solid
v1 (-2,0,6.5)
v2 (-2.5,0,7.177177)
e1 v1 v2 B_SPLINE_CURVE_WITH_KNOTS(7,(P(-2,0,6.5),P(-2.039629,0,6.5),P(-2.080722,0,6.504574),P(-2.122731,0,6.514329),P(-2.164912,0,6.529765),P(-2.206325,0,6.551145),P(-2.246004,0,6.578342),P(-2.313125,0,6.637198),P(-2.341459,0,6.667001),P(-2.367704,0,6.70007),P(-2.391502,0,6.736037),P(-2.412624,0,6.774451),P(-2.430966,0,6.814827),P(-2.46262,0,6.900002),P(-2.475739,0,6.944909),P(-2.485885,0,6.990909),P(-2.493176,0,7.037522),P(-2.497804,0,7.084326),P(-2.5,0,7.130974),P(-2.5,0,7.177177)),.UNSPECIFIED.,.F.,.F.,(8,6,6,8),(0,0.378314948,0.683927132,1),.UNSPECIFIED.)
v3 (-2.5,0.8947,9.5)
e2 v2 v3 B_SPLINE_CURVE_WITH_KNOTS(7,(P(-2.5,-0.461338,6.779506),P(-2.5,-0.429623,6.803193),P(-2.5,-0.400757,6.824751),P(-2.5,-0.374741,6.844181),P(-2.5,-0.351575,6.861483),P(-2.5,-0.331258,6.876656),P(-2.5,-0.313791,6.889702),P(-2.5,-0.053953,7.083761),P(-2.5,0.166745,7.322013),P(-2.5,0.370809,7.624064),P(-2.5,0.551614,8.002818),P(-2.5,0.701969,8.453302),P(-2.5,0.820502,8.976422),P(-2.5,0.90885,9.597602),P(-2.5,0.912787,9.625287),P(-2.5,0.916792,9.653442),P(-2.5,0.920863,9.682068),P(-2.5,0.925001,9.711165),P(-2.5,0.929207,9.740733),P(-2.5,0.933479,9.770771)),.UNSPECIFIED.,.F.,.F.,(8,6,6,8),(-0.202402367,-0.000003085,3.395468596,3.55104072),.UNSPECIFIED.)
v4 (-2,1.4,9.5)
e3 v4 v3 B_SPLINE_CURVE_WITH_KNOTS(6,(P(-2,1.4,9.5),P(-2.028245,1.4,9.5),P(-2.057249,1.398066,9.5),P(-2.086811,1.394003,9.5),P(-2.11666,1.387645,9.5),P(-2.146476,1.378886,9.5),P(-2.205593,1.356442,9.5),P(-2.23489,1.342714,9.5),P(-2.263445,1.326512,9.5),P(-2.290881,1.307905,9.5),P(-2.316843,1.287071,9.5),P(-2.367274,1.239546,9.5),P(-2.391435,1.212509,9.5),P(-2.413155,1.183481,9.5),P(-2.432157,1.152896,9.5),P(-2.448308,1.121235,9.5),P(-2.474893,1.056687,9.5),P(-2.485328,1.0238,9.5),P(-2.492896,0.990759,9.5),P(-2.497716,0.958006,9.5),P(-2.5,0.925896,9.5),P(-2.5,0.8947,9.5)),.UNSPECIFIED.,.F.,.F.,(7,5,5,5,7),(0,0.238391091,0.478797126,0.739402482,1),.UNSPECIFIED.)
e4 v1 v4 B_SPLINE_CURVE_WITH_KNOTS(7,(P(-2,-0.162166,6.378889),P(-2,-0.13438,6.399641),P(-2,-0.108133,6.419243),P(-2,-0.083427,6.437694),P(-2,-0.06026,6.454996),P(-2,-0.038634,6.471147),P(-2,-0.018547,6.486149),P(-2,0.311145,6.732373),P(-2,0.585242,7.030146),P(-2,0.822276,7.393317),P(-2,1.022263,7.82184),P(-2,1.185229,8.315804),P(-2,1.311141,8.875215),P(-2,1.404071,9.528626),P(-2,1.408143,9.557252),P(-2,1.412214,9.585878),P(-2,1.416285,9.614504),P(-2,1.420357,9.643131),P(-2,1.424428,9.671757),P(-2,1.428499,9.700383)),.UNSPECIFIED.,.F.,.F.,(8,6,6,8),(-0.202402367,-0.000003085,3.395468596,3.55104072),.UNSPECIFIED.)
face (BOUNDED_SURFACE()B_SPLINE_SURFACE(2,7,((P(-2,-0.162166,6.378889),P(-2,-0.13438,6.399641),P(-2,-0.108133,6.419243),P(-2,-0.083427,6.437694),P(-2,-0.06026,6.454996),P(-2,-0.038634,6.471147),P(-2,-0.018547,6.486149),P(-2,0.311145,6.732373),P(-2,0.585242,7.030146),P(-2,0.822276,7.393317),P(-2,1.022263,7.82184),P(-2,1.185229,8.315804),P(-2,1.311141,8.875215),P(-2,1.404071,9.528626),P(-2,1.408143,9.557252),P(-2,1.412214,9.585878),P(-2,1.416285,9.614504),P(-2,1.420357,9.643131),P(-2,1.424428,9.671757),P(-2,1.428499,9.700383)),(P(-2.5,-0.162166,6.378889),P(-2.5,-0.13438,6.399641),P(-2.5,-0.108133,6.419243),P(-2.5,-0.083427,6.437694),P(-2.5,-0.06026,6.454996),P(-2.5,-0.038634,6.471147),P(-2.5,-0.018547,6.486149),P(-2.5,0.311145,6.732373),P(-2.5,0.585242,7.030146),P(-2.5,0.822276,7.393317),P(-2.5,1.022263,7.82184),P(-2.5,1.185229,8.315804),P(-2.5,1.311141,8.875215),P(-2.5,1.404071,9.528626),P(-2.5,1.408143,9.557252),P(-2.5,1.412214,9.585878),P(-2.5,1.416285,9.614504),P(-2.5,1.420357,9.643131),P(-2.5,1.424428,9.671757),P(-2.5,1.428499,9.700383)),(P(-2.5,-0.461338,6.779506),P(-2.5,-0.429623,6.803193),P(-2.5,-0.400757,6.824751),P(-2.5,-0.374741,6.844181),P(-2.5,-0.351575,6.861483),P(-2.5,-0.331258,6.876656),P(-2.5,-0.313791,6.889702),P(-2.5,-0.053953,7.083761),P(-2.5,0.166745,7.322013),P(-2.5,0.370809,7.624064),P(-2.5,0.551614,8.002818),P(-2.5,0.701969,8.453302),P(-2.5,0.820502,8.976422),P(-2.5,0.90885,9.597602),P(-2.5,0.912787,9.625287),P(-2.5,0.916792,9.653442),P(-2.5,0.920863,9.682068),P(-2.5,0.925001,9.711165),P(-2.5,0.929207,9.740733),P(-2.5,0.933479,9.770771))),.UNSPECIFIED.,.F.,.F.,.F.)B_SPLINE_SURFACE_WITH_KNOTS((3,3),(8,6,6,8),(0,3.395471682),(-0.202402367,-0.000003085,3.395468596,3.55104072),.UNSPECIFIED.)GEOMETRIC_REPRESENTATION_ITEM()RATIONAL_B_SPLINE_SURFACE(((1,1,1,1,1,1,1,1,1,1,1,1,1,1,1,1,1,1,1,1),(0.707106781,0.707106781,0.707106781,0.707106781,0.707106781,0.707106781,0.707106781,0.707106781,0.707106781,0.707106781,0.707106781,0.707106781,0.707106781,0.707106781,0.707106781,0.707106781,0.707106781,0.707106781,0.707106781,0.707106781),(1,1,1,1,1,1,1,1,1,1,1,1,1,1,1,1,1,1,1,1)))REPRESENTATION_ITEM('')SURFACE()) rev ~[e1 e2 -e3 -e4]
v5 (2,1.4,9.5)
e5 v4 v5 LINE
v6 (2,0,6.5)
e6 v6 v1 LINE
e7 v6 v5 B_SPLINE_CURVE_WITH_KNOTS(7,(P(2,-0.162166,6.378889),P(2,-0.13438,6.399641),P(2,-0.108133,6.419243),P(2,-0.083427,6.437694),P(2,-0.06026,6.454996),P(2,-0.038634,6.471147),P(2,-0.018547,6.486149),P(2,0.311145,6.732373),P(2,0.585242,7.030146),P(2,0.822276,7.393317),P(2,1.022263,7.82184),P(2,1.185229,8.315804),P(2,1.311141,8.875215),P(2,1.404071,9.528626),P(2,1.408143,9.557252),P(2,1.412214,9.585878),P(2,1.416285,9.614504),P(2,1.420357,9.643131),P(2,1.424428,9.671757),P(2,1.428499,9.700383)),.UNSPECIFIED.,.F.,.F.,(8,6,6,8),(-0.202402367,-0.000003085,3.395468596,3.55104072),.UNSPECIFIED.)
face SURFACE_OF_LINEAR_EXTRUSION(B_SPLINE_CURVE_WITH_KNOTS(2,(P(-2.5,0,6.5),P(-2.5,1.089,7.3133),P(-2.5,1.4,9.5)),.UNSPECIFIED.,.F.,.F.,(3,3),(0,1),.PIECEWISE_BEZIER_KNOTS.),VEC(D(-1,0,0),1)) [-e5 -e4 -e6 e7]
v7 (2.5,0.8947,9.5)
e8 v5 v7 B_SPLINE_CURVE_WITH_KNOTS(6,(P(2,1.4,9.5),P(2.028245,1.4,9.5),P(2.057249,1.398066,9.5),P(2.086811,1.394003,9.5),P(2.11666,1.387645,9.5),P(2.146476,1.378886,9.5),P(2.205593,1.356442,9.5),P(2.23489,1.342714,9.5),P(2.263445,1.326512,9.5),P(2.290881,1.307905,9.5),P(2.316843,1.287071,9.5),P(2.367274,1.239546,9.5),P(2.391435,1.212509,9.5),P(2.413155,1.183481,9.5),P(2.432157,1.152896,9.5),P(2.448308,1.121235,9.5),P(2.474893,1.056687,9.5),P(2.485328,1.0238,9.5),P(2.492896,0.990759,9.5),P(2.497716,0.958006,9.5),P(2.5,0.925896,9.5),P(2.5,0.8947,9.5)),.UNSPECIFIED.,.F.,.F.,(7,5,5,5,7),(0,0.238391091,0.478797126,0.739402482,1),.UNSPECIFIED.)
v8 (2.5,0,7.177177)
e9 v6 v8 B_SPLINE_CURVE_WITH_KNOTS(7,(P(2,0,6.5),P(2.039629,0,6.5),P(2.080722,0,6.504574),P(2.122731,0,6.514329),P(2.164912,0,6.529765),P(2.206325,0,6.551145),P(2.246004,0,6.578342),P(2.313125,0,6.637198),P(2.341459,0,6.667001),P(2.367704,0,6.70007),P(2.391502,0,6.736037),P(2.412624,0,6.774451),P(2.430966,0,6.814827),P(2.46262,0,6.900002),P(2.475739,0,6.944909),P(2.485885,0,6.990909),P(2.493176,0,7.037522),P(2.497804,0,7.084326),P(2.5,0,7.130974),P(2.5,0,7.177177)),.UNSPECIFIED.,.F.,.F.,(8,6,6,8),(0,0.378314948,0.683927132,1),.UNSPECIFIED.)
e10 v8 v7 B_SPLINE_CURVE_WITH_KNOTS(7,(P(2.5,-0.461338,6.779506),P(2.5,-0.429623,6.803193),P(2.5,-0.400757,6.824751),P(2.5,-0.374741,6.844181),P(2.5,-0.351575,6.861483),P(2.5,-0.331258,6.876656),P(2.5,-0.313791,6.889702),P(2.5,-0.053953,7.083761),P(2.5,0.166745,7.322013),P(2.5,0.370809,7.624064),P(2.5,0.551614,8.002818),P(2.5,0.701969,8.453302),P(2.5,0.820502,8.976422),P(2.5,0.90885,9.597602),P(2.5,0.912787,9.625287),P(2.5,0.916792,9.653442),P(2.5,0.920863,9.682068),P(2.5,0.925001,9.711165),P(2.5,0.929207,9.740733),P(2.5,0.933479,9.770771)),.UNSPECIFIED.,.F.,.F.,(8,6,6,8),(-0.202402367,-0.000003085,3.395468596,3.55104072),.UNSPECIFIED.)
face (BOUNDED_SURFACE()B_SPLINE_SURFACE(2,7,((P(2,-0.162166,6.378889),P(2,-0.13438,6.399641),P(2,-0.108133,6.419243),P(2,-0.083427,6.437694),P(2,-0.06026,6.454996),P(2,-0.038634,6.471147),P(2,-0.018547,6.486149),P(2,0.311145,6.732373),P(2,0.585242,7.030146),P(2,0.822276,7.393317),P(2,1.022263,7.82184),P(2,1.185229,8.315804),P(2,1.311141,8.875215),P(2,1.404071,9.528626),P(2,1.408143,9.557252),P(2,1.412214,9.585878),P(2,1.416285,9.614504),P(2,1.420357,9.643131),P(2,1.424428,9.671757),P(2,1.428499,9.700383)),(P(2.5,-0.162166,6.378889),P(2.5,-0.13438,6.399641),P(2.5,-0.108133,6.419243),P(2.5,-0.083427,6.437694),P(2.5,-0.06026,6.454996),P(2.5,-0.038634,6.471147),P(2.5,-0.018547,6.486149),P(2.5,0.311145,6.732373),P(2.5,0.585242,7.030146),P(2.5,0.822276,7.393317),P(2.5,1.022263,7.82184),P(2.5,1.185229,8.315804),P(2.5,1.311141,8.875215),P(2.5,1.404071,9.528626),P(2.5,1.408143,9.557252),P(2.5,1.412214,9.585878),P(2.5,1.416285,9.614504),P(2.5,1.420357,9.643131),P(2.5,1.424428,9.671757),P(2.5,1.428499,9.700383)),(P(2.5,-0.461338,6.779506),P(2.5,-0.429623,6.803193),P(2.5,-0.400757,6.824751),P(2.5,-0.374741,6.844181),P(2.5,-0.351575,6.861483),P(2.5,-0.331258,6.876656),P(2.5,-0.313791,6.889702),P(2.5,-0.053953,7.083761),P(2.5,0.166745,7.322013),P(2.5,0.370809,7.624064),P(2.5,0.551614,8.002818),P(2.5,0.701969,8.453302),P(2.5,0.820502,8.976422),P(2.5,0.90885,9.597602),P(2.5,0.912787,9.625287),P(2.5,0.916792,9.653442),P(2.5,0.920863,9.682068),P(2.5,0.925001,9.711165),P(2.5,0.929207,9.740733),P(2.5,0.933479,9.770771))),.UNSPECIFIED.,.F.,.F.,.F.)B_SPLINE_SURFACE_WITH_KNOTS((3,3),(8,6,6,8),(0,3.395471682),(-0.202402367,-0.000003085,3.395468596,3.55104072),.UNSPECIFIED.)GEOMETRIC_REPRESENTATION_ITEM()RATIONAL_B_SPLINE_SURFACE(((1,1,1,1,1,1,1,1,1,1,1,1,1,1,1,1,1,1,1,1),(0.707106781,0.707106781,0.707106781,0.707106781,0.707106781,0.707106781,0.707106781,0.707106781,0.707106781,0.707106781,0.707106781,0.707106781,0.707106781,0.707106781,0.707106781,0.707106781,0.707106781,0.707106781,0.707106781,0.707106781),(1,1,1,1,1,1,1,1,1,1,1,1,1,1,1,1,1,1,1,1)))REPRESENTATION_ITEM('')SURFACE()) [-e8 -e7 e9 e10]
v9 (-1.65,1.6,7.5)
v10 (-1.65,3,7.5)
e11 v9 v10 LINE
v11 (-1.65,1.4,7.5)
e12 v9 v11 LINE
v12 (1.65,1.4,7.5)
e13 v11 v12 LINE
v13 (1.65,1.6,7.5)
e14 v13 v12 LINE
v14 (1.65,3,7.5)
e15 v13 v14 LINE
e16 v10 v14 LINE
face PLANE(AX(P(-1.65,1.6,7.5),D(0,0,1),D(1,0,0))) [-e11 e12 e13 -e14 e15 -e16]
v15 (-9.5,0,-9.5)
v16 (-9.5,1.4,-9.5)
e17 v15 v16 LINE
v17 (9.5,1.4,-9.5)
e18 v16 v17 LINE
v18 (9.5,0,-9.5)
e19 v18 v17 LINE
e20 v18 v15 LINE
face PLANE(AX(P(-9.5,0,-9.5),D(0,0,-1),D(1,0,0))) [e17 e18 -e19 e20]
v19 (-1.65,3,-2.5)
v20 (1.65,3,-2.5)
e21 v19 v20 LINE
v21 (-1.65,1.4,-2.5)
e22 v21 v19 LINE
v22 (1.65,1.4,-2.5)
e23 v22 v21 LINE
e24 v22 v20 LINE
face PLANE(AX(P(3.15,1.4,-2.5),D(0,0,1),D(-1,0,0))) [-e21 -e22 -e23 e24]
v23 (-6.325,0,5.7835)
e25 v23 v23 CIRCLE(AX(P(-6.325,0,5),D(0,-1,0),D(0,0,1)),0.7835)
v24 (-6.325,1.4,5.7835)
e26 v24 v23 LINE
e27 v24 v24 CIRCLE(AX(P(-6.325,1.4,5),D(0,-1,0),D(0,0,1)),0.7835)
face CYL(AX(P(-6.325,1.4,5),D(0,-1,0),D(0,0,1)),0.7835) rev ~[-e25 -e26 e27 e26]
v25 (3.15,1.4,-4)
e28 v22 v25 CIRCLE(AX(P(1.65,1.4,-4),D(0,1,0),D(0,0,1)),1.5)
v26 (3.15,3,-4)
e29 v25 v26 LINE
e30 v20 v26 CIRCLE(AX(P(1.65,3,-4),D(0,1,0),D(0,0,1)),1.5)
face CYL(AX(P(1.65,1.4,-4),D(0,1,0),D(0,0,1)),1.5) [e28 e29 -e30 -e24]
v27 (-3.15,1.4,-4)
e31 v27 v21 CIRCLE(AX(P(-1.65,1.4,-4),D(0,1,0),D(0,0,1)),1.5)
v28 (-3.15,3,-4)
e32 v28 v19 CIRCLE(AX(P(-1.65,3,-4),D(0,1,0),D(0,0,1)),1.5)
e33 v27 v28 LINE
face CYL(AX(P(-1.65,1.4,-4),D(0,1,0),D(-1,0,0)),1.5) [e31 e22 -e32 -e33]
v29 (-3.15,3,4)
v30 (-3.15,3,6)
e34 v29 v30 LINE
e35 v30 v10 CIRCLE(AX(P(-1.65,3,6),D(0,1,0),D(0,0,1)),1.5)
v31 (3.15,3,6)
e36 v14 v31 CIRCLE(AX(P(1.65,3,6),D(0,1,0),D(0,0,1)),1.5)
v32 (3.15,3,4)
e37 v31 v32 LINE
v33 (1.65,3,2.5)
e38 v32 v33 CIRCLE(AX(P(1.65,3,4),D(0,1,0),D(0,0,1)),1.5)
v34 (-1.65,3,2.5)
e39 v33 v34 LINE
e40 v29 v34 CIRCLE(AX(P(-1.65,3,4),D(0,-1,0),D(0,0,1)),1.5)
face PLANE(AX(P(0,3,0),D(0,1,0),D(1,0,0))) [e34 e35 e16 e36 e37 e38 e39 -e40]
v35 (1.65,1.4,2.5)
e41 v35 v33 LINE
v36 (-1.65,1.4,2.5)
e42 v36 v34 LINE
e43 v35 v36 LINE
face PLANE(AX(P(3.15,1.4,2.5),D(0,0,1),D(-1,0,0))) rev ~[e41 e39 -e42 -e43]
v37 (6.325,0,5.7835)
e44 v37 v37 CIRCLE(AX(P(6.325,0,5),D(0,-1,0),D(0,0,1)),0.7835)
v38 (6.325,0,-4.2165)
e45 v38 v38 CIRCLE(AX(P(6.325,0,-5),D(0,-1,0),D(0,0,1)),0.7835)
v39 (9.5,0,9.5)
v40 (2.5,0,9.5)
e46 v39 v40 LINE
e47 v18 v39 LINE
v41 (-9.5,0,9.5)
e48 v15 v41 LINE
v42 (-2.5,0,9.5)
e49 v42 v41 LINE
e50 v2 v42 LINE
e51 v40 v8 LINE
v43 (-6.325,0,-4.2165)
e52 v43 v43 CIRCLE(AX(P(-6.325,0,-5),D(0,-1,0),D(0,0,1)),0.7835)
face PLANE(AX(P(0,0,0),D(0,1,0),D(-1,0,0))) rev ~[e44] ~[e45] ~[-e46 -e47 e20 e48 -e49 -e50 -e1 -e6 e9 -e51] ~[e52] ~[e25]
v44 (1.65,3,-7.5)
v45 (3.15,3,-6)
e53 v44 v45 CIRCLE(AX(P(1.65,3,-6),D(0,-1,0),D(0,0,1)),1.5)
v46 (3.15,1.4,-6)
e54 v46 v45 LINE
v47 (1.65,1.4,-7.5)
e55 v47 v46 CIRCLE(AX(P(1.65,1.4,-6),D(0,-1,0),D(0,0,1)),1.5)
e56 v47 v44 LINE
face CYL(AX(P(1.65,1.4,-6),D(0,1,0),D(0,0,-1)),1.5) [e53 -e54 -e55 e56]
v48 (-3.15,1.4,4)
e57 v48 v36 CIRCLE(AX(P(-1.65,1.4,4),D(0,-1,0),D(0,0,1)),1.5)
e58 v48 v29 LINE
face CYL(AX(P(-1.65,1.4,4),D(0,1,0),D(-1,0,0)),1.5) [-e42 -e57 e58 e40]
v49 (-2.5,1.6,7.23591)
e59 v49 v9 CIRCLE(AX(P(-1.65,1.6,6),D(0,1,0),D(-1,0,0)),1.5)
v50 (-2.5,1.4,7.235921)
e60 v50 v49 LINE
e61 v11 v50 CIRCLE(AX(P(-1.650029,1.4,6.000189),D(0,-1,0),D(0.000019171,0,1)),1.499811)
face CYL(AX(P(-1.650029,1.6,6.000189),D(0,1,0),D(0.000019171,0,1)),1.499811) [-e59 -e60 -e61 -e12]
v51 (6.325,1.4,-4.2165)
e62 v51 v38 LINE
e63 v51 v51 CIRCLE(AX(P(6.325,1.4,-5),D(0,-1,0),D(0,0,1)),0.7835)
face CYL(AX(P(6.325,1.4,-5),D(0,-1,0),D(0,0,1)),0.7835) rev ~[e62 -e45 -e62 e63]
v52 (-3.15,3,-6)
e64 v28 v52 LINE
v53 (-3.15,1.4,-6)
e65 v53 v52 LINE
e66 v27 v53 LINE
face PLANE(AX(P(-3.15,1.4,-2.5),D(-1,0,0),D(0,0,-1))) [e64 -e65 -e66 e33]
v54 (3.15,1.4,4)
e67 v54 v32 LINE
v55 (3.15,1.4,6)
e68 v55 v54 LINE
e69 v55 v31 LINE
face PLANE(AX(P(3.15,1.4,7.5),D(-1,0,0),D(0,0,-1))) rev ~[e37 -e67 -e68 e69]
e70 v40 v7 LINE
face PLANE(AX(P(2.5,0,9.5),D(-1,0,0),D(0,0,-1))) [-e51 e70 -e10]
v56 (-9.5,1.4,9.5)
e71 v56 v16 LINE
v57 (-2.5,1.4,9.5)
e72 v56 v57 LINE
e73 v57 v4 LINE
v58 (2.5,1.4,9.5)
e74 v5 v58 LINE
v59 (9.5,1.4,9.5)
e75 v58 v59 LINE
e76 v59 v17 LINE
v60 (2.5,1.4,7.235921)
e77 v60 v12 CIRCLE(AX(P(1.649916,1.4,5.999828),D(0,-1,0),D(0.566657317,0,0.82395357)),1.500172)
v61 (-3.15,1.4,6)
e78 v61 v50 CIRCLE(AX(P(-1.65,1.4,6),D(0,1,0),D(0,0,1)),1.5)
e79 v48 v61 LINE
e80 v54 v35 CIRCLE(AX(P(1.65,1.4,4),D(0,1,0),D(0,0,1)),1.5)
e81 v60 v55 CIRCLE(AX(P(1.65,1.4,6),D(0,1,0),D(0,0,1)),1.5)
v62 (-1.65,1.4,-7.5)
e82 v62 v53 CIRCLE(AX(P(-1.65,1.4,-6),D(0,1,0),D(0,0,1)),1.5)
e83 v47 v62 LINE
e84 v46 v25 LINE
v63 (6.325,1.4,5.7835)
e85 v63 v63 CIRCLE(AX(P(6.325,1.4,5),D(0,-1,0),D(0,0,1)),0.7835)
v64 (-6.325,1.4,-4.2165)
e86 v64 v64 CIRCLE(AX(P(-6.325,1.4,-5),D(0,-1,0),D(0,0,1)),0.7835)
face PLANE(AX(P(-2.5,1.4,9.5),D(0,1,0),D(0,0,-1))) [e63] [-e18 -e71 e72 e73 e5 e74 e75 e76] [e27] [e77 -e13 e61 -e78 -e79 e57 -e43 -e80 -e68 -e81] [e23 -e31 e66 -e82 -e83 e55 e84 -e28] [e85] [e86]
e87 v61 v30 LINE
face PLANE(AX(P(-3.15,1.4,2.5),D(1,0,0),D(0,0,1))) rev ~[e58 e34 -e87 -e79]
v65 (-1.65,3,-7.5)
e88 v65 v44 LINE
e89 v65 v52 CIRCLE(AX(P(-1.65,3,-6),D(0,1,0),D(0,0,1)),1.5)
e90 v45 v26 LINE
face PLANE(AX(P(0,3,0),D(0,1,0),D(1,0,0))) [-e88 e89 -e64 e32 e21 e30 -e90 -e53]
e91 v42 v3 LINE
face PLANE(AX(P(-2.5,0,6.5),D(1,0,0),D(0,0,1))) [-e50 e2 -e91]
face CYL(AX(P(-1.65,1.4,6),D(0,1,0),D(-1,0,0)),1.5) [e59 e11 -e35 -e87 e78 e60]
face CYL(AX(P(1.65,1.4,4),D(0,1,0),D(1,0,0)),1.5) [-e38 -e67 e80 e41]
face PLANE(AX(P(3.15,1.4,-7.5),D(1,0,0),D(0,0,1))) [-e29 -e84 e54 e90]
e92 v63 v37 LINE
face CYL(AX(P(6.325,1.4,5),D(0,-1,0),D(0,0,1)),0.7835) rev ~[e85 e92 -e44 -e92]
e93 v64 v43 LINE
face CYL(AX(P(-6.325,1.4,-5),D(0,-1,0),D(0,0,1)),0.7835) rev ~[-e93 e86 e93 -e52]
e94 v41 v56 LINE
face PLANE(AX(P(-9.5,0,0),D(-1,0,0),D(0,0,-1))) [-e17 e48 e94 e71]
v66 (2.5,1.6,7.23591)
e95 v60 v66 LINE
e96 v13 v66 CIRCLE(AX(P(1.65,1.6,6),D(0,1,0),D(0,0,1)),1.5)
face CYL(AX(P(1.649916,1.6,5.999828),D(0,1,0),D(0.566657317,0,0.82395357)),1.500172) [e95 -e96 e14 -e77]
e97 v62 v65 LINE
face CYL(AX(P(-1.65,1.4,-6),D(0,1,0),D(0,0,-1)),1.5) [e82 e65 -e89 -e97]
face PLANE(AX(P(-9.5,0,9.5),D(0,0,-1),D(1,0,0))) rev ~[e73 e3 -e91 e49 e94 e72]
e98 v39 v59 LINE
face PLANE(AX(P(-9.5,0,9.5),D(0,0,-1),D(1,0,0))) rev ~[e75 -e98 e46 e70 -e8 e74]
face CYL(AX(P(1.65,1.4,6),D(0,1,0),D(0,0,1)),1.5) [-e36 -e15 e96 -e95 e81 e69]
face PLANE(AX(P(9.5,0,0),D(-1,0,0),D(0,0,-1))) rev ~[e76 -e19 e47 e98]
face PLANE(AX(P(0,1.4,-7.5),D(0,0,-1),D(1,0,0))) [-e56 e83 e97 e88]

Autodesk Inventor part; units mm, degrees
ref_plane "YZ Plane" through (0, 0, 0) normal (1, 0, 0) x (0, 1, 0)
ref_plane "XZ Plane" through (0, 0, 0) normal (0, 1, 0) x (-1, 0, 0)
ref_plane "XY Plane" through (0, 0, 0) normal (0, 0, 1) x (1, 0, 0)
sketch "スケッチ1" plane through (0, 0, 0) normal (0, 1, 0) x (-1, 0, 0)
  line L0 (9.5, -9.5) -> (0, -9.5)
  line L1 (0, -9.5) -> (0, -2.5)
  line L2 (0, 0) -> (3.15, 0)
  line L3 (9.5, 0) -> (9.5, -9.5)
  line L4 (0, 0) -> (3.15, 0)
  line L5 (3.15, 0) -> (3.15, -1)
  line L6 (1.65, -2.5) -> (0, -2.5)
  line L7 (0, -2.5) -> (0, 0)
  arc A0 (1.65, -2.5) -> (3.15, -1) centre (1.65, -1) ccw
  line L8 (3.15, 0) -> (6.325, 0)
  line L9 (6.325, 0) -> (9.5, 0)
  line L10 (0, -2.5) -> (0, 0)
  line L11 (9.5, 9.5) -> (0, 9.5)
  line L12 (9.5, 0) -> (9.5, 9.5)
  line L13 (3.15, 0) -> (3.15, 1)
  line L14 (1.65, 2.5) -> (0, 2.5)
  arc A1 (3.15, 1) -> (1.65, 2.5) centre (1.65, 1) ccw
  line L15 (-9.5, -9.5) -> (0, -9.5)
  line L16 (-9.5, 0) -> (-9.5, -9.5)
  line L17 (-3.15, 0) -> (-3.15, -1)
  line L18 (-1.65, -2.5) -> (0, -2.5)
  arc A2 (-3.15, -1) -> (-1.65, -2.5) centre (-1.65, -1) ccw
  line L19 (-9.5, 9.5) -> (0, 9.5)
  line L20 (-9.5, 0) -> (-9.5, 9.5)
  line L21 (-3.15, 0) -> (-3.15, 1)
  arc A3 (-1.65, 2.5) -> (-3.15, 1) centre (-1.65, 1) ccw
  line L22 (-1.65, 2.5) -> (0, 2.5)
  point P0 (-6.325, 0)
  dimension "d2" = 1.5
  dimension "d3" = 19
  dimension "d4" = 6.3
  dimension "d5" = 5
  dimension "d6" = 19
extrude "押し出し1" add sketch "スケッチ1" along normal blind 1.4
sketch "スケッチ2" plane through (0, 1.4, 0) normal (0, 1, 0) x (1, 0, 0)
  line L0 (9.5, 9.5) -> (-9.5, 9.5) projected
  line L1 (0, 9.5) -> (0, 7.5)
  line L2 (0, 7.5) -> (0, 2.5)
  line L3 (0, 2.5) -> (0, 0)
  line L4 (-3.15, 7.5) -> (3.15, 7.5)
  line L5 (3.15, 7.5) -> (3.15, 2.5)
  line L6 (3.15, 2.5) -> (-3.15, 2.5)
  line L7 (-3.15, 2.5) -> (-3.15, 7.5)
  line L8 (-9.5, 9.5) -> (-9.5, -9.5) projected
  line L9 (-9.5, 0) -> (9.5, 0)
  line L10 (9.5, -9.5) -> (9.5, 9.5) projected
  line L11 (-3.15, -7.5) -> (3.15, -7.5)
  line L12 (3.15, -7.5) -> (3.15, -2.5)
  line L13 (3.15, -2.5) -> (-3.15, -2.5)
  line L14 (-3.15, -2.5) -> (-3.15, -7.5)
  dimension "d11" = 6.3
  dimension "d12" = 2.5
  dimension "d13" = 5
extrude "押し出し2" add sketch "スケッチ2" along normal blind 1.6 contours L4 L5 L6 L2 | L2 L6 L7 L4 | L14 L13 L12 L11
fillet "フィレット1" radius 1.5 8 edges at (-3.15, 2.2, -2.5) (-3.15, 2.2, 7.5) (3.15, 2.2, 7.5) (3.15, 2.2, 2.5) (-3.15, 2.2, 2.5) (3.15, 2.2, -2.5) (3.15, 2.2, -7.5) (-3.15, 2.2, -7.5)
sketch "スケッチ3" plane through (0, 1.4, 0) normal (0, 1, 0) x (1, 0, 0)
  arc A0 (-1.65, 7.5) -> (-3.15, 6) centre (-1.65, 6) ccw projected
  line L0 (-3.15, 6) -> (-3.15, 4) projected
  arc A1 (-3.15, 4) -> (-1.65, 2.5) centre (-1.65, 4) ccw projected
  line L1 (-1.65, 2.5) -> (1.65, 2.5) projected
  arc A2 (1.65, 2.5) -> (3.15, 4) centre (1.65, 4) ccw projected
  line L2 (3.15, 4) -> (3.15, 6) projected
  arc A3 (3.15, 6) -> (1.65, 7.5) centre (1.65, 6) ccw projected
  line L3 (1.65, 7.5) -> (-1.65, 7.5) projected
  arc A4 (-1.65, -2.5) -> (-3.15, -4) centre (-1.65, -4) ccw projected
  line L4 (-3.15, -4) -> (-3.15, -6) projected
  arc A5 (-3.15, -6) -> (-1.65, -7.5) centre (-1.65, -6) ccw projected
  line L5 (-1.65, -7.5) -> (1.65, -7.5) projected
  arc A6 (1.65, -7.5) -> (3.15, -6) centre (1.65, -6) ccw projected
  line L6 (3.15, -6) -> (3.15, -4) projected
  arc A7 (3.15, -4) -> (1.65, -2.5) centre (1.65, -4) ccw projected
  line L7 (1.65, -2.5) -> (-1.65, -2.5) projected
  line L8 (-3.15, 5) -> (-9.5, 5)
  line L9 (-9.5, 9.5) -> (-9.5, -9.5) projected
  line L10 (-9.5, 0) -> (0, 0)
  line L11 (0, 0) -> (0, 9.5)
  line L12 (9.5, 9.5) -> (-9.5, 9.5) projected
  point P0 (-6.325, 5)
  point P1 (-6.325, -5)
  point P2 (6.325, 5)
  point P3 (6.325, -5)
hole "穴1" at (-6.325, 1.4, -5) at (-6.325, 1.4, 5) at (6.325, 1.4, -5) at (6.325, 1.4, 5) direction (0, -1, 0) diameter 1.567 end through all thread size "M2x0.4" class "6H" standard "ISO Metric profile"
sketch "スケッチ4" plane through (0, 0, 0) normal (0, -1, 0) x (1, 0, 0)
  line L0 (-2.5, 9.5) -> (2.5, 9.5)
  line L1 (2.5, 9.5) -> (2.5, 6.5)
  line L2 (2.5, 6.5) -> (-2.5, 6.5)
  line L3 (-2.5, 6.5) -> (-2.5, 9.5)
  line L4 (-9.5, 9.5) -> (9.5, 9.5) projected
  point P0 (0, 0)
  point P1 (0, 9.5)
  dimension "d24" = 5
  dimension "d25" = 3
extrude "押し出し3" cut sketch "スケッチ4" against normal blind 1.6
sketch "スケッチ5" plane through (-2.5, 0, 9.5) normal (1, 0, 0) x (0, 0, -1)
  line L0 (2.2641, 1.4) -> (2.2641, 1.6) projected
  line L1 (0, 1.4) -> (2.2641, 1.4) projected
  line L2 (0, 0) -> (0, 1.4) projected
  line L3 (3, 0) -> (0, 0) projected
  line L4 (3, 0) -> (3, 1.6) projected
  line L5 (3, 1.6) -> (2.2641, 1.6) projected
  spline S0 degree 2 poles (3, 0) (2.1867, 1.089) (0, 1.4) knots 0 0 0 1 1 1
  point P0 (9.5, 0)
  point P1 (2.0329, 0.8)
extrude "押し出し4" add sketch "スケッチ5" along normal up to surface (5 mm away) contours L0 L5 L4 S0 L1
sketch "スケッチ6" plane through (0, 1.6, 0) normal (0, -1, 0) x (1, 0, 0)
  line L0 (-2.5, 7.2359) -> (2.5, 7.2359) projected
  arc A0 (2.5, 7.2359) -> (1.65, 7.5) centre (1.65, 6) ccw projected
  line L1 (-1.65, 7.5) -> (1.65, 7.5) projected
  arc A1 (-1.65, 7.5) -> (-2.5, 7.2359) centre (-1.65, 6) ccw projected
  point P0 (0, 0)
extrude "押し出し5" add sketch "スケッチ6" along normal up to surface (0.2 mm away)
fillet "フィレット2" radius 0.5 2 edges at (-2.5, 0.8945, 7.6566) (2.5, 0.8945, 7.6566)
properties part number "sensorbar"
